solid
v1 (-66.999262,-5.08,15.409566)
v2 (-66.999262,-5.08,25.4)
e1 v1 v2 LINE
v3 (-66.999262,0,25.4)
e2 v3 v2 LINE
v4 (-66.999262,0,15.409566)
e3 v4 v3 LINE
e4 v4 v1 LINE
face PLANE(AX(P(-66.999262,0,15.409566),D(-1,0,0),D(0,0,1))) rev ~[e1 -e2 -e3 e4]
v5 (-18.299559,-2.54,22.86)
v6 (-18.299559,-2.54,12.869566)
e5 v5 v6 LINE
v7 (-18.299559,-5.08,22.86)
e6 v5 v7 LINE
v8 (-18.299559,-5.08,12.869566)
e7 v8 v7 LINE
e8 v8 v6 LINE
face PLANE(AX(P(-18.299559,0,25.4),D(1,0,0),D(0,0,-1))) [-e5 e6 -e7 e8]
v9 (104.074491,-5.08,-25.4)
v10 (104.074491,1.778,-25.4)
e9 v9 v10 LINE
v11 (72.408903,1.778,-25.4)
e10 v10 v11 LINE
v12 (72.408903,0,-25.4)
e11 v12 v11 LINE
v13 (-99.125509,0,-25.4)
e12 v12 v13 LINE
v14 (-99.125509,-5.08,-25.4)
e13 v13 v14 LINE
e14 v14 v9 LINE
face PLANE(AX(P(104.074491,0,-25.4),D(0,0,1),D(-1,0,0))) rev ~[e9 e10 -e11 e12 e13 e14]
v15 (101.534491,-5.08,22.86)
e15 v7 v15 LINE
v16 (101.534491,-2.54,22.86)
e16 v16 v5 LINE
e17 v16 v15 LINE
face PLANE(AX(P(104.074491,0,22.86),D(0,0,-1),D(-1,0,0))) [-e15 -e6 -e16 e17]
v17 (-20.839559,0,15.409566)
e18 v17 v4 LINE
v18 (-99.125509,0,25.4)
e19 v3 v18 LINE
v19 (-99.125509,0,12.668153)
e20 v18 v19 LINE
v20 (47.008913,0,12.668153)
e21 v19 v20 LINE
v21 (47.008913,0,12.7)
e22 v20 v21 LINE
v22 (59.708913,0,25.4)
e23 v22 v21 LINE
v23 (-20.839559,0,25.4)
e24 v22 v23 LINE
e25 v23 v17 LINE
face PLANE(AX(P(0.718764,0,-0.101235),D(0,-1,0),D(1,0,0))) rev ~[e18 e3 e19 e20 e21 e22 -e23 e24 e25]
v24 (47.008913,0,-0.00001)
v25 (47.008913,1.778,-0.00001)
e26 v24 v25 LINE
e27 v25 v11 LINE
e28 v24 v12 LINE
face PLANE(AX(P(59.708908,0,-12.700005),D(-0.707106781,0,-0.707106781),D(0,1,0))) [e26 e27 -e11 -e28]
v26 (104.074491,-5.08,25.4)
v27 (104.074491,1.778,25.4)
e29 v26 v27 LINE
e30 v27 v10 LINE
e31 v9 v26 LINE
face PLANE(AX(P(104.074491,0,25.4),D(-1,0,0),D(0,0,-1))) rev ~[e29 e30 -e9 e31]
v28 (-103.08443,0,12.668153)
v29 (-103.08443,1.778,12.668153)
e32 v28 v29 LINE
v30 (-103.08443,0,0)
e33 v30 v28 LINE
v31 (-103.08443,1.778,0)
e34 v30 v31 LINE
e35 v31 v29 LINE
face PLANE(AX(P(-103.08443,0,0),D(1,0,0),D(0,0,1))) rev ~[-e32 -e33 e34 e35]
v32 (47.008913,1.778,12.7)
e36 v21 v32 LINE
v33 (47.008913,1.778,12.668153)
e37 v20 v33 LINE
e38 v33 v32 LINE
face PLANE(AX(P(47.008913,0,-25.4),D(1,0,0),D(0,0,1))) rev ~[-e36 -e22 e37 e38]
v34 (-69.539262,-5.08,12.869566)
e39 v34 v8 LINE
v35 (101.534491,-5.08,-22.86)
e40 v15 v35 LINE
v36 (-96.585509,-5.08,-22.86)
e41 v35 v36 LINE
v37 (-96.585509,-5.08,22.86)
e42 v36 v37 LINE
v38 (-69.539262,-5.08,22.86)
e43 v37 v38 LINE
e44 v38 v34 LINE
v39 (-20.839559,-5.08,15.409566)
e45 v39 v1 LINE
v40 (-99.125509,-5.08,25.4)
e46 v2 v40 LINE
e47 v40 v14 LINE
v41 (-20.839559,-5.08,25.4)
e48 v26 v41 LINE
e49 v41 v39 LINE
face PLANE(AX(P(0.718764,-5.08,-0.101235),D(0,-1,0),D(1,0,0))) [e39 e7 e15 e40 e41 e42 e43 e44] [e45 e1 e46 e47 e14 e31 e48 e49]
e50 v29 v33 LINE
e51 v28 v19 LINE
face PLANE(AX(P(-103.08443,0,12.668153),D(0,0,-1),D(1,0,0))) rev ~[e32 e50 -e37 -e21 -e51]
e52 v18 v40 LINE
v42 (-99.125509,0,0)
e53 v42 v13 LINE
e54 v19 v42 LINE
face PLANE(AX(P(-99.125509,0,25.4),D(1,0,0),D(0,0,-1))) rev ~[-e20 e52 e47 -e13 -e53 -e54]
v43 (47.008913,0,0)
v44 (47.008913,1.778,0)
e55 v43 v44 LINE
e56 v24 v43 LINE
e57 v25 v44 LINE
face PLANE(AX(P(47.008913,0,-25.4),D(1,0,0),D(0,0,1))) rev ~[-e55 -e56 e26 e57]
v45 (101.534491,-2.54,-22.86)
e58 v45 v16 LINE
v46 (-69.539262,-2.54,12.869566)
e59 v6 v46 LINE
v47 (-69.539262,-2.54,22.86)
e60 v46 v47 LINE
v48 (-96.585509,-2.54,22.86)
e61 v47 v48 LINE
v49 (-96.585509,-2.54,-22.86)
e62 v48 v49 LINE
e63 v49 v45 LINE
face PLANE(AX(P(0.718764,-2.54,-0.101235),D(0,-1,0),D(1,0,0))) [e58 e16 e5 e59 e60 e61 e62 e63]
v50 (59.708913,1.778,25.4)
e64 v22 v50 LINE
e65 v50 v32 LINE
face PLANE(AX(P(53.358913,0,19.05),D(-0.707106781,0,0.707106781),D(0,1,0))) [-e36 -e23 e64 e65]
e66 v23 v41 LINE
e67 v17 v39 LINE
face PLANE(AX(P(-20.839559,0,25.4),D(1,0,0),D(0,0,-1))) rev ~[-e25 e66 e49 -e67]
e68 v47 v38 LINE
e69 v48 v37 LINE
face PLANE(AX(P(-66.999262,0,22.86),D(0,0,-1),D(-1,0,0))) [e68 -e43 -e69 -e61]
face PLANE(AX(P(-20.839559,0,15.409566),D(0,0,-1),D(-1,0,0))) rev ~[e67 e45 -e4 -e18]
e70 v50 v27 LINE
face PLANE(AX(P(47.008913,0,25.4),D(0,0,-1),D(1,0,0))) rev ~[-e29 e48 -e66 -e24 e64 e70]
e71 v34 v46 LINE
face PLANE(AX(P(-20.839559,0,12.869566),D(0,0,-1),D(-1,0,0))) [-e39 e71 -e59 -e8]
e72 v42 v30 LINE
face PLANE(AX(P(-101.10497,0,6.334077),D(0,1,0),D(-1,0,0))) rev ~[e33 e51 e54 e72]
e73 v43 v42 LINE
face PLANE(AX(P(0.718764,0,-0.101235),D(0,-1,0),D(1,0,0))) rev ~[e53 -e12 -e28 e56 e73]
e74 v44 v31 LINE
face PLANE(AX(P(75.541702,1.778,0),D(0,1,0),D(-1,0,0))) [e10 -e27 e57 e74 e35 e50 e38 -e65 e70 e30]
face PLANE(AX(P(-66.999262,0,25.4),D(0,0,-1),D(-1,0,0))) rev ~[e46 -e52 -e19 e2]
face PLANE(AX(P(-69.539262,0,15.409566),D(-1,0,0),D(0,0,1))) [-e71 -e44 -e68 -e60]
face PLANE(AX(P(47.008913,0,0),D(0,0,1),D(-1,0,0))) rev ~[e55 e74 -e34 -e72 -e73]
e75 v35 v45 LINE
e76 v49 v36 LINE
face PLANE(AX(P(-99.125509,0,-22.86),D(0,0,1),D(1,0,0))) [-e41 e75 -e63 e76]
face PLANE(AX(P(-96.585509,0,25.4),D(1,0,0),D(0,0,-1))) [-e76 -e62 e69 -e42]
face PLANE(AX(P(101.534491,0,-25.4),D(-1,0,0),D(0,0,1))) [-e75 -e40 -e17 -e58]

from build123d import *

# Parameters (mm, degrees)
F1_DEPTH = 5.08
F2_T     = -2.54
F3_W     = 3.9589210415
F3_H     = 12.6681532711
F3_W_2   = 146.1344220674
F4_DEPTH = 1.778
F6_DEPTH = 1.778
F7_SIZE  = 12.7
F8_SIZE  = 25.39999


# Not quite as in the source:
# - a fillet or chamfer is up to 0.001 mm smaller than in the source, because OpenCascade refuses the exact size


with BuildPart() as f1:
    # F0 (on Front) → F1 (new body)
    with BuildSketch(Plane.XZ):
        Polygon((104.074490943, -25.4), (104.074490943, 25.4), (-20.8395591676, 25.4), (-20.8395591676, 15.409566462), (-66.9992624521, 15.409566462), (-66.9992624521, 25.4), (-99.125509057, 25.4), (-99.125509057, -25.4), align=None)
    extrude(amount=F1_DEPTH)

    # F2
    f2_openings = [f1.faces().sort_by_distance(p)[0] for p in [
        (4.64404, -5.08, -0.954203),
    ]]
    offset(amount=F2_T, openings=f2_openings, kind=Kind.INTERSECTION)

    # F3 (on face) → F4 (join)
    with BuildSketch(Plane(origin=(0, 0, 0), x_dir=(-1, 0, 0), z_dir=(0, 1, 0))):
        with Locations((101.1049695778, 6.3340766355)):
            Rectangle(F3_W, F3_H)
        with Locations((26.0582980233, 6.3340766355)):
            Rectangle(F3_W_2, F3_H)
    extrude(amount=F4_DEPTH)

    # F5 (on face) → F6 (join)
    with BuildSketch(Plane(origin=(0, 0, 0), x_dir=(-1, 0, 0), z_dir=(0, 1, 0))):
        Polygon((-47.0089130104, 12.6681532711), (-47.0089130104, 25.4), (-104.074490943, 25.4), (-104.074490943, -25.4), (-47.0089130104, -25.4), (-47.0089130104, 0), align=None)
    extrude(amount=F6_DEPTH)

    # F7
    f7_edges = [f1.edges().sort_by_distance(p)[0] for p in [
        (47.008913, 0.889, 25.4),
    ]]
    chamfer(f7_edges, length=F7_SIZE)

    # F8 (size 25.4 in the source; OpenCascade refuses exactly that, so slightly less here)
    f8_edges = [f1.edges().sort_by_distance(p)[0] for p in [
        (47.008913, 0.889, -25.4),
    ]]
    chamfer(f8_edges, length=F8_SIZE)


solid = f1.part
